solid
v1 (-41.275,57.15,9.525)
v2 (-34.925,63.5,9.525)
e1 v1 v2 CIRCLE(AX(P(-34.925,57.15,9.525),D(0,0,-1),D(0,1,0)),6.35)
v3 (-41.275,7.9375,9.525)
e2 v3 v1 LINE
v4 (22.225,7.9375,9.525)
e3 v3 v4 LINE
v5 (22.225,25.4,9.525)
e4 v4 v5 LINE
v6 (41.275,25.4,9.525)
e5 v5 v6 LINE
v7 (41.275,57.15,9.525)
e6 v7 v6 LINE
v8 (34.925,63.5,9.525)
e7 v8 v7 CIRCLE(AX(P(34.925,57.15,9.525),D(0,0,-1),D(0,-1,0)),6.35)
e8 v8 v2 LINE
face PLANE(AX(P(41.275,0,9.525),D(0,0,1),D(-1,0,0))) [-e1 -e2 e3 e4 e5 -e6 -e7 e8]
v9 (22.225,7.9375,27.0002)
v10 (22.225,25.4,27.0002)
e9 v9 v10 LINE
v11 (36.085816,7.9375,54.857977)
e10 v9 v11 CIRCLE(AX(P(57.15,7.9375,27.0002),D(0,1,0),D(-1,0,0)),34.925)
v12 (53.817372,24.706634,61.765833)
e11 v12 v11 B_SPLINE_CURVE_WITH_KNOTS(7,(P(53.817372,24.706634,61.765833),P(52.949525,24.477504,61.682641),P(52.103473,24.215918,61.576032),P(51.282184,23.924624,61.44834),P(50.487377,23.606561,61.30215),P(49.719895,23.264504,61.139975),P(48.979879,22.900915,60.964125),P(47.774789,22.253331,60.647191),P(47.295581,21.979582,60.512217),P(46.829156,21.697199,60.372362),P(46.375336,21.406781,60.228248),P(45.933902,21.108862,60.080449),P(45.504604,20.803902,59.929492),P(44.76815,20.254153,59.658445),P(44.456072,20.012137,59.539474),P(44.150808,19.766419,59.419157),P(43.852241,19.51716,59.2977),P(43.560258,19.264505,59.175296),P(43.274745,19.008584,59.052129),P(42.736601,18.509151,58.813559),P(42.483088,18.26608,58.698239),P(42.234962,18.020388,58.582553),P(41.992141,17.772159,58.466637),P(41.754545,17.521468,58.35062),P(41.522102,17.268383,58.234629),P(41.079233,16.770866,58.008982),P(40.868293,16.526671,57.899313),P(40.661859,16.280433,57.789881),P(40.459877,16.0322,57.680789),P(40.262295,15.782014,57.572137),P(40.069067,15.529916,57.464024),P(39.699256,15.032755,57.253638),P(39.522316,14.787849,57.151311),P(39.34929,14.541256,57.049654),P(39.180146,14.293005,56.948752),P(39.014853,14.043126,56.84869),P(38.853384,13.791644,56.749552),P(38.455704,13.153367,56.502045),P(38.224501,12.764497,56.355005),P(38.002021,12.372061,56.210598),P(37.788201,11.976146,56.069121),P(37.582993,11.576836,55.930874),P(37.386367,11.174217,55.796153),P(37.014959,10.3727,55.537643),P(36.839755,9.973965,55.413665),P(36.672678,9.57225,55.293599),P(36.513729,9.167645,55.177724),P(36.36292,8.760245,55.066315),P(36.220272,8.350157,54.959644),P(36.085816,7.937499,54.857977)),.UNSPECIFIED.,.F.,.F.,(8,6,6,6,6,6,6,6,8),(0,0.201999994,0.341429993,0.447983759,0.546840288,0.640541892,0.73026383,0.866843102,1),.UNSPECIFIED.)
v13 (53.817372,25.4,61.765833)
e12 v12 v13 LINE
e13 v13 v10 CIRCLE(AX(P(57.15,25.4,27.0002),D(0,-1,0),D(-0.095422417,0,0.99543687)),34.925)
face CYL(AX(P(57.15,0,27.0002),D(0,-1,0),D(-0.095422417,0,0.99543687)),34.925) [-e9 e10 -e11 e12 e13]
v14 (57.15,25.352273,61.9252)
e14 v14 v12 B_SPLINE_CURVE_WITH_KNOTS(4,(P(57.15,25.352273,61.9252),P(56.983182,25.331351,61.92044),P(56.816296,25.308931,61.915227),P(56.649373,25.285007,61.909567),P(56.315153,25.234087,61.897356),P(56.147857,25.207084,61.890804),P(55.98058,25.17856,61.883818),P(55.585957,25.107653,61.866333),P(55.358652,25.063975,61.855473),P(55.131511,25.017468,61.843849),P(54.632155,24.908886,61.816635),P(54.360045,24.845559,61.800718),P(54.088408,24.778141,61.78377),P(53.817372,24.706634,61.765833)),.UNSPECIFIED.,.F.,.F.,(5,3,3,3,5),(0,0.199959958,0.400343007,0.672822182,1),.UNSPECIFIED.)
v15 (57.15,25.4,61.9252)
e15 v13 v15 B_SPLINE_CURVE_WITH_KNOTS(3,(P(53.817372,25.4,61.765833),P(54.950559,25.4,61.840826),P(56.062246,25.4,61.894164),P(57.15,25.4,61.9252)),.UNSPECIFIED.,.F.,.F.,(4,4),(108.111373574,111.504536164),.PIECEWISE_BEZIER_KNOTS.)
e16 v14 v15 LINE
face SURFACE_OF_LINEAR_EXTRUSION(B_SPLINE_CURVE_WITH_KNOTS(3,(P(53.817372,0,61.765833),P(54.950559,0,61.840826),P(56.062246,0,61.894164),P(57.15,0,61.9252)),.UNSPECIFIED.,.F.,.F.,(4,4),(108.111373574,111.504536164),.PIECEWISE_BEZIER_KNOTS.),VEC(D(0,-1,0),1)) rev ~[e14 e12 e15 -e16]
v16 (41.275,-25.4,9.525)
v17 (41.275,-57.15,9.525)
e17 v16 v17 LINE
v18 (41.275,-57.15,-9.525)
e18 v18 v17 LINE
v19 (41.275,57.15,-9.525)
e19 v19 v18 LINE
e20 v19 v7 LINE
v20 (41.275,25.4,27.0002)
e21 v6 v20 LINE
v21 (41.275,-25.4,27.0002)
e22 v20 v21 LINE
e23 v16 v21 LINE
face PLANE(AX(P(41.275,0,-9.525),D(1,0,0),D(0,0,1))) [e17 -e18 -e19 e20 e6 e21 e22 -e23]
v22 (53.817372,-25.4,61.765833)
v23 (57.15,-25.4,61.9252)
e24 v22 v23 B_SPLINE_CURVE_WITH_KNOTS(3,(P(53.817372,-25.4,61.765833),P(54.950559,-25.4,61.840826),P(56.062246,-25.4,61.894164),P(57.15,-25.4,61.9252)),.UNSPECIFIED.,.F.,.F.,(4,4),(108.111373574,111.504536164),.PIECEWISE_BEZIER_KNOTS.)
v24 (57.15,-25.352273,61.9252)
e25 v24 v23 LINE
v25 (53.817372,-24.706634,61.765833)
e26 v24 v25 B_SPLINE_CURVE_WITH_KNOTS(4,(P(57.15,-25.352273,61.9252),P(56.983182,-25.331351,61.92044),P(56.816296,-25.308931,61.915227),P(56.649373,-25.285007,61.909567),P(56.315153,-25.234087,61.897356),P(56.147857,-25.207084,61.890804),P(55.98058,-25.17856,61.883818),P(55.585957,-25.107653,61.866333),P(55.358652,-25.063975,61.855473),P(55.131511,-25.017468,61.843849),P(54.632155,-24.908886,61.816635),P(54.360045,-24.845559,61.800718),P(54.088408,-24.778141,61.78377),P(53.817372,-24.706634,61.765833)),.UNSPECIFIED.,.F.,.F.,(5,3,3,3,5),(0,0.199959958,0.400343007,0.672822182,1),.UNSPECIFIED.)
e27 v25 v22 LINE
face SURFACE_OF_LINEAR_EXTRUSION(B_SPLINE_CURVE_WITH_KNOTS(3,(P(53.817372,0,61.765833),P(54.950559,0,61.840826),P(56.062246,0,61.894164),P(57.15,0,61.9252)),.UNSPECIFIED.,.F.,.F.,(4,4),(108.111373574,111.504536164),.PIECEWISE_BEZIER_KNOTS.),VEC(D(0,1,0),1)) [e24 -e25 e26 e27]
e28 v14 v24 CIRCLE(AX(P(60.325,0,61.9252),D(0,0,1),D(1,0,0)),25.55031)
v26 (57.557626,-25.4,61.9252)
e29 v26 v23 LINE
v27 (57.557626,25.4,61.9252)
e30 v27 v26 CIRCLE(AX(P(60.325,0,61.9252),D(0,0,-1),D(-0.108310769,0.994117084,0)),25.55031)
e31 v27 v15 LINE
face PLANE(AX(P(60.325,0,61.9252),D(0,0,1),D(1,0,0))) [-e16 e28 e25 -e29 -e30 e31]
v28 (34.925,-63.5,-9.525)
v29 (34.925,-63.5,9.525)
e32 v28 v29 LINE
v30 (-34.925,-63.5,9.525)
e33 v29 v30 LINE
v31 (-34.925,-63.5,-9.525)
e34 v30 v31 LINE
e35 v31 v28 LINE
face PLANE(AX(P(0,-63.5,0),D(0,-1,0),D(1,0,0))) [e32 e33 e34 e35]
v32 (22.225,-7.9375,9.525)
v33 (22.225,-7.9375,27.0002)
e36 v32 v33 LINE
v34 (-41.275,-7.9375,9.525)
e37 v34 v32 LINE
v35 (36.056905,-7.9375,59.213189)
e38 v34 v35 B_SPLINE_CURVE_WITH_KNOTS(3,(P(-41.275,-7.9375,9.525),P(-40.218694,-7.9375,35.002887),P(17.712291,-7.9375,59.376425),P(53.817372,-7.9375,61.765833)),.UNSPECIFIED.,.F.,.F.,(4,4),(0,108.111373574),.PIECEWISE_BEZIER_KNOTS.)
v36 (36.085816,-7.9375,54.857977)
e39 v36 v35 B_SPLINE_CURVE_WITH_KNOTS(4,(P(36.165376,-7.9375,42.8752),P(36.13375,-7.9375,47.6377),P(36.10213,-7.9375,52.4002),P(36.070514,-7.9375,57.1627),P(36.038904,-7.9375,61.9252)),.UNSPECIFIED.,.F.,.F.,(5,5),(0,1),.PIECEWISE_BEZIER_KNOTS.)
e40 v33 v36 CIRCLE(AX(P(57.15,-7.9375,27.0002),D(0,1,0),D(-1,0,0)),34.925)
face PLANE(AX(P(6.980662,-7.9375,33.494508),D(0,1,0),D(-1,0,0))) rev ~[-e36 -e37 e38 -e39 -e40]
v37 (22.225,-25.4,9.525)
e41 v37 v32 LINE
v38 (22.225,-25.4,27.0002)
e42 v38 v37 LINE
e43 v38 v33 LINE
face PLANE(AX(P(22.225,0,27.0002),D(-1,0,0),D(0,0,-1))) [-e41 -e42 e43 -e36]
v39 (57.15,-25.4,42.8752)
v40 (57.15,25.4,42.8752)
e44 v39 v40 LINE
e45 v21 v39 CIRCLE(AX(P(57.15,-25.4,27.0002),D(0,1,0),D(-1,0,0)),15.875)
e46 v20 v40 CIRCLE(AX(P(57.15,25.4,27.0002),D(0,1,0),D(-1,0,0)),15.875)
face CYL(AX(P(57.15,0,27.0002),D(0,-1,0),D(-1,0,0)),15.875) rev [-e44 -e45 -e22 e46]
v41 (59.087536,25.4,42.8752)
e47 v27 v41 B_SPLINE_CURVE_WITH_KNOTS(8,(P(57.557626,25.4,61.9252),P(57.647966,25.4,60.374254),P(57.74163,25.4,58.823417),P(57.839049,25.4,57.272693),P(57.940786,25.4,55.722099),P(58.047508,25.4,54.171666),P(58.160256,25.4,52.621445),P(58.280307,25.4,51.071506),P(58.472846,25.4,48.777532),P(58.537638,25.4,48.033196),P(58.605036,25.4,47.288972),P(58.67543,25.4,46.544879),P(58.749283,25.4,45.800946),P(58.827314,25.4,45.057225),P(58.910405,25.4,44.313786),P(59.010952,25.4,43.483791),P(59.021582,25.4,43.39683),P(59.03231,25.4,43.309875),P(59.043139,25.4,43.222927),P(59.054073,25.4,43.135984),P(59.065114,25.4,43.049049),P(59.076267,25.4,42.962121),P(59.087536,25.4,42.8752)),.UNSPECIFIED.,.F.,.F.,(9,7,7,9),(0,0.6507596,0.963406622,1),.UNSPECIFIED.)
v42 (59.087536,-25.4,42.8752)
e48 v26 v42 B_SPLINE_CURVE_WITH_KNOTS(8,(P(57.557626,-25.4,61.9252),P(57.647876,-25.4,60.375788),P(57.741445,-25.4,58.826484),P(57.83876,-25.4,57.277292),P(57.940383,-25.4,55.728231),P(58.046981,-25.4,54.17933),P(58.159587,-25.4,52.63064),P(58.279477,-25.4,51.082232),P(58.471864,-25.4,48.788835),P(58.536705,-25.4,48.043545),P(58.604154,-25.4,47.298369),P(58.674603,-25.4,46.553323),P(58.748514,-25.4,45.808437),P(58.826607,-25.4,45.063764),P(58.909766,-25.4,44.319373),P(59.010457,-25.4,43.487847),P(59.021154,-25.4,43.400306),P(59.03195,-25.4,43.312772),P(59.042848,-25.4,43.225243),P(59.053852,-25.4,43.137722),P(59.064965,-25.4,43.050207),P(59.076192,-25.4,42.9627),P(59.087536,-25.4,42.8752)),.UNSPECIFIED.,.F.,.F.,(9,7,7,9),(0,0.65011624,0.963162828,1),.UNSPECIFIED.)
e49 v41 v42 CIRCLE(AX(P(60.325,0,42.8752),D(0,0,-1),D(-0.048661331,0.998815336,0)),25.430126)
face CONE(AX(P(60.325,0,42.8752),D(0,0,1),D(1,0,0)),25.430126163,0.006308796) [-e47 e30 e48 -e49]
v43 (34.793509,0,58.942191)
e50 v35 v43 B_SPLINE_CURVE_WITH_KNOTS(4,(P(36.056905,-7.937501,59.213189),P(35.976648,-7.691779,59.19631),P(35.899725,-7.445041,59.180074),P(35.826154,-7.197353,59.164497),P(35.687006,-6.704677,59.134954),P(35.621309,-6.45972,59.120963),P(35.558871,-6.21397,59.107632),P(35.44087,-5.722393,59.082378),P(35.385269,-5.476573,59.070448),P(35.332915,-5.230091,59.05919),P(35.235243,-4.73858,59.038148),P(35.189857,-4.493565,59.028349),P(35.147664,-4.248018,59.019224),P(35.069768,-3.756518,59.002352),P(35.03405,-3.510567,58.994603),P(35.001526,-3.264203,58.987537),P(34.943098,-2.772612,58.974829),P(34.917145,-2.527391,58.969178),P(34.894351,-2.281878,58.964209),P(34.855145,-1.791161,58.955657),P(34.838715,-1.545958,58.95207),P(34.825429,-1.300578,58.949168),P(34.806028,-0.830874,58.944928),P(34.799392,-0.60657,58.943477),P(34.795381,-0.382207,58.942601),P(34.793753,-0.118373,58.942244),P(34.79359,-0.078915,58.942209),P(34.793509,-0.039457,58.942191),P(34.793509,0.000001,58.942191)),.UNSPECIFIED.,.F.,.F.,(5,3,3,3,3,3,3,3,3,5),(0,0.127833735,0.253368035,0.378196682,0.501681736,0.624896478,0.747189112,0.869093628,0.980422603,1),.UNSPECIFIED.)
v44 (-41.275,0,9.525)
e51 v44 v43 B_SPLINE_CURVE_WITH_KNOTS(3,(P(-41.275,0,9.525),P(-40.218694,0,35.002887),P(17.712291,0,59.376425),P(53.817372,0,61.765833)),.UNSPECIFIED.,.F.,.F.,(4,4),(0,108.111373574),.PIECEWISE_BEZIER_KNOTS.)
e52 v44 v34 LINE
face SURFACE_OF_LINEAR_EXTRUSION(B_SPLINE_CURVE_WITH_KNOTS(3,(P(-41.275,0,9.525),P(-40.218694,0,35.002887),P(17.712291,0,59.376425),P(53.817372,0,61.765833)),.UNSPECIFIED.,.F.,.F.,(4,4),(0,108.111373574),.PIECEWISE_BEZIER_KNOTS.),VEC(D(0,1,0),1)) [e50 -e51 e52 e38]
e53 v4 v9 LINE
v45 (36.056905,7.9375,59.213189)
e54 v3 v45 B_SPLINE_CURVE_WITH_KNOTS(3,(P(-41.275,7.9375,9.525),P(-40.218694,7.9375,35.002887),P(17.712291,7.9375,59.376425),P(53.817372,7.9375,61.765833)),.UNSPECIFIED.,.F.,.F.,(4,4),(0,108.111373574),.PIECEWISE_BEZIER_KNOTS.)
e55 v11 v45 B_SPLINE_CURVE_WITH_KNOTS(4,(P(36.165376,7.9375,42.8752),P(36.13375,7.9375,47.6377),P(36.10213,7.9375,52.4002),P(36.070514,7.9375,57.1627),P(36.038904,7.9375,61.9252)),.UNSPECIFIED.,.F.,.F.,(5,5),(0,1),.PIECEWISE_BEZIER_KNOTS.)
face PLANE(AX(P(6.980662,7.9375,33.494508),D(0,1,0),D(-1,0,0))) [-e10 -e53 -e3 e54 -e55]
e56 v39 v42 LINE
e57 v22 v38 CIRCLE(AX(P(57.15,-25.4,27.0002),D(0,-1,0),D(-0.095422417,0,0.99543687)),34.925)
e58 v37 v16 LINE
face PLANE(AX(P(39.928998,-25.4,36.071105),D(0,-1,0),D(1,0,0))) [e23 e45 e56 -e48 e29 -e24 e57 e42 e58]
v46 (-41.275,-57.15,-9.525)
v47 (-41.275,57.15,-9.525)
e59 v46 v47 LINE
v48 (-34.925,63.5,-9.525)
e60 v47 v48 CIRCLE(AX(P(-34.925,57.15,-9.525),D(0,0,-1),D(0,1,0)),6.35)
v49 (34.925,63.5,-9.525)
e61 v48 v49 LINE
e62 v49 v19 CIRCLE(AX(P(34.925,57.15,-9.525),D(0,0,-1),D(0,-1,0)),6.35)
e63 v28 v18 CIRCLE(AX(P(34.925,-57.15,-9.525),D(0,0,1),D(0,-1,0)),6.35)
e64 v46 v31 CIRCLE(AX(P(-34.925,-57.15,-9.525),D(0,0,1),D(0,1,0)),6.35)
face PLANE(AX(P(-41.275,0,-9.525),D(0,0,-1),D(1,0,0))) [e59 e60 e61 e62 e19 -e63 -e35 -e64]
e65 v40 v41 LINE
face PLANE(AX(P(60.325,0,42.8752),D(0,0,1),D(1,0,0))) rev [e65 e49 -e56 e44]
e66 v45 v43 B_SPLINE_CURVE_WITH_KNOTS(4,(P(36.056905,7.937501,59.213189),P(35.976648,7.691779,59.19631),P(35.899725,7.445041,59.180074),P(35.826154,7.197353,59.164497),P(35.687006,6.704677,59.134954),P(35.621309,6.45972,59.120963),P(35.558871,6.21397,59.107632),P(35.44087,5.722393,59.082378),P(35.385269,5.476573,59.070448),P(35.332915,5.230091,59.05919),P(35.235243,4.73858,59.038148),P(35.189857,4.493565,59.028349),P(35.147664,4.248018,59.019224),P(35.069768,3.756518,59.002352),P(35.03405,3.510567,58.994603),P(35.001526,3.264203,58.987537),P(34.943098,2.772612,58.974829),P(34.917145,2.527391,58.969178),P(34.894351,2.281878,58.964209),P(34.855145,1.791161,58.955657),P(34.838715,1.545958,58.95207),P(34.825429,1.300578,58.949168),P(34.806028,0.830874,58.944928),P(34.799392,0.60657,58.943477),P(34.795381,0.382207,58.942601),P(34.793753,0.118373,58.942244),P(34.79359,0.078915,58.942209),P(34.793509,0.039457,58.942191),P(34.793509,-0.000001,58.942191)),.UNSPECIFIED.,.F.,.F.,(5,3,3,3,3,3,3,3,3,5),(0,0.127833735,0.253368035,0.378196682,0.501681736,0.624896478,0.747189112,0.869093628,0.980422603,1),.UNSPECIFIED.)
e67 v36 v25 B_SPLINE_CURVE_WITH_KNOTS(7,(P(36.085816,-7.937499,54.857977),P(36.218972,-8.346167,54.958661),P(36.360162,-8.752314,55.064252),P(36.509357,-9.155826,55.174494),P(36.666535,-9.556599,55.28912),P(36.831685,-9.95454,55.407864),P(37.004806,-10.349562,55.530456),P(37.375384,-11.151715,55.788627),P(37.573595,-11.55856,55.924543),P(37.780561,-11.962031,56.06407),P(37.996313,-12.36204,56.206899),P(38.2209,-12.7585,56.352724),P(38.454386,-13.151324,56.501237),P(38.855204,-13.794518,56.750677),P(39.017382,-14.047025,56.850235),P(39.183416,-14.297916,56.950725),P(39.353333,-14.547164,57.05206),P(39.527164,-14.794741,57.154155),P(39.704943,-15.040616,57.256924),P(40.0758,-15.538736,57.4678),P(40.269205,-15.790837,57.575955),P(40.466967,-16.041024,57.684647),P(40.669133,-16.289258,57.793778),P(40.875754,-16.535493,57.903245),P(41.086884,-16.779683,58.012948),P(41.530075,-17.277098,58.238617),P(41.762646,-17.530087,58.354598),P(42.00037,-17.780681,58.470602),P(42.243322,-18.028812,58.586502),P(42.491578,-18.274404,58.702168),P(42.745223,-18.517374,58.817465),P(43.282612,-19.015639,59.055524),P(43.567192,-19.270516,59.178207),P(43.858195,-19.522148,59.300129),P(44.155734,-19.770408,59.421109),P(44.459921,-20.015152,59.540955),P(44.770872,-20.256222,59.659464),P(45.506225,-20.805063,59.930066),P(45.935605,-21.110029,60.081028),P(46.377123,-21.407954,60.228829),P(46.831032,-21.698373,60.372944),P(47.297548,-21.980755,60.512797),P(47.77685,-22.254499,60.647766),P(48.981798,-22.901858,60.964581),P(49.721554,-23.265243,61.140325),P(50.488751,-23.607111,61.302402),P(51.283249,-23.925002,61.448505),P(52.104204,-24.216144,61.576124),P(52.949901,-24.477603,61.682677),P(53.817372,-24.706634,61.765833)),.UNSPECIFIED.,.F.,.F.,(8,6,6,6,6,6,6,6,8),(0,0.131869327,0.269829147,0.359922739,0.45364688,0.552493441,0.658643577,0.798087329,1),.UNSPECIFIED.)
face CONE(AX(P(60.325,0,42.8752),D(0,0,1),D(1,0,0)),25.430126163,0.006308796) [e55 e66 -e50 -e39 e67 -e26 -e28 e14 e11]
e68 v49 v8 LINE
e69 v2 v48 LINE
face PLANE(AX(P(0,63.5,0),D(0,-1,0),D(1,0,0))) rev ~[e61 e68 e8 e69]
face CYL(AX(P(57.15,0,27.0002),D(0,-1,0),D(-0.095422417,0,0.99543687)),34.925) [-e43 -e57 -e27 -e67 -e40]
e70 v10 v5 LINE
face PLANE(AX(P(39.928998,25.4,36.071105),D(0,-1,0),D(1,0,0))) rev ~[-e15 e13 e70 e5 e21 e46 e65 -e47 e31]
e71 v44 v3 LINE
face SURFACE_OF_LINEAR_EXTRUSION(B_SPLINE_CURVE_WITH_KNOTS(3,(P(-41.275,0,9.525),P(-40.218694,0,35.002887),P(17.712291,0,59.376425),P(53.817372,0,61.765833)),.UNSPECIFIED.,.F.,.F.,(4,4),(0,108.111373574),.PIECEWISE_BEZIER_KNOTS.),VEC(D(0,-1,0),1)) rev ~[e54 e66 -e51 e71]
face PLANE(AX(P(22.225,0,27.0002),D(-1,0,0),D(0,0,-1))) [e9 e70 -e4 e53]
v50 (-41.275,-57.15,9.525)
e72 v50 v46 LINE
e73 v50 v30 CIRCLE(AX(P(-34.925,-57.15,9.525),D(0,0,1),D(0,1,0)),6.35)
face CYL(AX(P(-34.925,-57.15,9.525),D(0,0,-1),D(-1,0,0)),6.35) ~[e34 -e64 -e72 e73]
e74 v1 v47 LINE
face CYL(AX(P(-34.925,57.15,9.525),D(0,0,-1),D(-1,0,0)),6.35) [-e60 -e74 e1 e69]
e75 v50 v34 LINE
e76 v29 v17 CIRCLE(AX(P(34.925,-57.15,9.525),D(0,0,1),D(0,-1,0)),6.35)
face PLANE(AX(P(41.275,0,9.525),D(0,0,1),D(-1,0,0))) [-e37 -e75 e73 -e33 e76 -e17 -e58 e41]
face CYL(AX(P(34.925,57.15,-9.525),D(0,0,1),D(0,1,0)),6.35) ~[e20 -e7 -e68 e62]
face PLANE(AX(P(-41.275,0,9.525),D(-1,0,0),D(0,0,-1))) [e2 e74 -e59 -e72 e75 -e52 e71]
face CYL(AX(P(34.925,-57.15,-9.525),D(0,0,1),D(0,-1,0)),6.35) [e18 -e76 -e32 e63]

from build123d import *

# Parameters (mm, degrees)
F1_DEPTH = 63.5
F2_DEPTH = 25.4
F3_DEPTH = 7.9375
F4_R     = 6.35


with BuildPart() as f1:
    # F0 (on Front) → F1 (new body, symmetric)
    with BuildSketch(Plane.XZ):
        Polygon((-41.275, -9.525), (41.275, -9.525), (41.275, 9.525), (22.225, 9.525), (-41.275, 9.525), align=None)
    extrude(amount=F1_DEPTH, both=True)

    # F0 (on Front) → F2 (join, symmetric)
    with BuildSketch(Plane.XZ):
        with BuildLine():
            Line((22.225, 9.525), (41.275, 9.525))
            Line((41.275, 9.525), (41.275, 27.0002))
            ThreePointArc((41.275, 27.0002), (45.9246798487, 38.2255201513), (57.15, 42.8752))
            Line((57.15, 42.8752), (60.325, 42.8752))
            Line((60.325, 42.8752), (60.325, 61.9252))
            Line((60.325, 61.9252), (57.15, 61.9252))
            add(Edge.make_bspline(
                [(53.8173720822, 61.7658326875), (54.9505591394, 61.8408261866), (56.0622461787, 61.8941638054), (57.15, 61.9252)],
                knots=[108.1113735744, 108.1113735744, 108.1113735744, 108.1113735744, 111.5045361635, 111.5045361635, 111.5045361635, 111.5045361635], degree=3))
            ThreePointArc((53.8173720822, 61.7658326875), (31.3028758367, 50.4881074735), (22.225, 27.0002))
            Line((22.225, 27.0002), (22.225, 9.525))
        make_face()
    extrude(amount=F2_DEPTH, both=True)

    # F0 (on Front) → F3 (join, symmetric)
    with BuildSketch(Plane.XZ):
        with BuildLine():
            add(Edge.make_bspline(
                [(-41.275, 9.525), (-40.218694031, 35.0028870222), (17.7122913335, 59.3764245807), (53.8173720822, 61.7658326875)],
                knots=[0, 0, 0, 0, 108.1113735744, 108.1113735744, 108.1113735744, 108.1113735744], degree=3))
            Line((-41.275, 9.525), (22.225, 9.525))
            Line((22.225, 9.525), (22.225, 27.0002))
            ThreePointArc((22.225, 27.0002), (31.3028758367, 50.4881074735), (53.8173720822, 61.7658326875))
        make_face()
    extrude(amount=F3_DEPTH, both=True)

    # F4
    f4_edges = [f1.edges().sort_by_distance(p)[0] for p in [
        (-41.275, -63.5, 0),
        (41.275, -63.5, 0),
        (41.275, 63.5, 0),
        (-41.275, 63.5, 0),
    ]]
    fillet(f4_edges, radius=F4_R)

    # F0 (on Front) → F5 (revolve)
    with BuildSketch(Plane.XZ):
        Polygon((60.325, 61.9252), (60.325, 42.8752), (85.7551261626, 42.8752), (85.8753103219, 61.9252), align=None)
    revolve(axis=Axis((60.325, 0, 52.3875), (0, 0, 1)))


solid = f1.part
